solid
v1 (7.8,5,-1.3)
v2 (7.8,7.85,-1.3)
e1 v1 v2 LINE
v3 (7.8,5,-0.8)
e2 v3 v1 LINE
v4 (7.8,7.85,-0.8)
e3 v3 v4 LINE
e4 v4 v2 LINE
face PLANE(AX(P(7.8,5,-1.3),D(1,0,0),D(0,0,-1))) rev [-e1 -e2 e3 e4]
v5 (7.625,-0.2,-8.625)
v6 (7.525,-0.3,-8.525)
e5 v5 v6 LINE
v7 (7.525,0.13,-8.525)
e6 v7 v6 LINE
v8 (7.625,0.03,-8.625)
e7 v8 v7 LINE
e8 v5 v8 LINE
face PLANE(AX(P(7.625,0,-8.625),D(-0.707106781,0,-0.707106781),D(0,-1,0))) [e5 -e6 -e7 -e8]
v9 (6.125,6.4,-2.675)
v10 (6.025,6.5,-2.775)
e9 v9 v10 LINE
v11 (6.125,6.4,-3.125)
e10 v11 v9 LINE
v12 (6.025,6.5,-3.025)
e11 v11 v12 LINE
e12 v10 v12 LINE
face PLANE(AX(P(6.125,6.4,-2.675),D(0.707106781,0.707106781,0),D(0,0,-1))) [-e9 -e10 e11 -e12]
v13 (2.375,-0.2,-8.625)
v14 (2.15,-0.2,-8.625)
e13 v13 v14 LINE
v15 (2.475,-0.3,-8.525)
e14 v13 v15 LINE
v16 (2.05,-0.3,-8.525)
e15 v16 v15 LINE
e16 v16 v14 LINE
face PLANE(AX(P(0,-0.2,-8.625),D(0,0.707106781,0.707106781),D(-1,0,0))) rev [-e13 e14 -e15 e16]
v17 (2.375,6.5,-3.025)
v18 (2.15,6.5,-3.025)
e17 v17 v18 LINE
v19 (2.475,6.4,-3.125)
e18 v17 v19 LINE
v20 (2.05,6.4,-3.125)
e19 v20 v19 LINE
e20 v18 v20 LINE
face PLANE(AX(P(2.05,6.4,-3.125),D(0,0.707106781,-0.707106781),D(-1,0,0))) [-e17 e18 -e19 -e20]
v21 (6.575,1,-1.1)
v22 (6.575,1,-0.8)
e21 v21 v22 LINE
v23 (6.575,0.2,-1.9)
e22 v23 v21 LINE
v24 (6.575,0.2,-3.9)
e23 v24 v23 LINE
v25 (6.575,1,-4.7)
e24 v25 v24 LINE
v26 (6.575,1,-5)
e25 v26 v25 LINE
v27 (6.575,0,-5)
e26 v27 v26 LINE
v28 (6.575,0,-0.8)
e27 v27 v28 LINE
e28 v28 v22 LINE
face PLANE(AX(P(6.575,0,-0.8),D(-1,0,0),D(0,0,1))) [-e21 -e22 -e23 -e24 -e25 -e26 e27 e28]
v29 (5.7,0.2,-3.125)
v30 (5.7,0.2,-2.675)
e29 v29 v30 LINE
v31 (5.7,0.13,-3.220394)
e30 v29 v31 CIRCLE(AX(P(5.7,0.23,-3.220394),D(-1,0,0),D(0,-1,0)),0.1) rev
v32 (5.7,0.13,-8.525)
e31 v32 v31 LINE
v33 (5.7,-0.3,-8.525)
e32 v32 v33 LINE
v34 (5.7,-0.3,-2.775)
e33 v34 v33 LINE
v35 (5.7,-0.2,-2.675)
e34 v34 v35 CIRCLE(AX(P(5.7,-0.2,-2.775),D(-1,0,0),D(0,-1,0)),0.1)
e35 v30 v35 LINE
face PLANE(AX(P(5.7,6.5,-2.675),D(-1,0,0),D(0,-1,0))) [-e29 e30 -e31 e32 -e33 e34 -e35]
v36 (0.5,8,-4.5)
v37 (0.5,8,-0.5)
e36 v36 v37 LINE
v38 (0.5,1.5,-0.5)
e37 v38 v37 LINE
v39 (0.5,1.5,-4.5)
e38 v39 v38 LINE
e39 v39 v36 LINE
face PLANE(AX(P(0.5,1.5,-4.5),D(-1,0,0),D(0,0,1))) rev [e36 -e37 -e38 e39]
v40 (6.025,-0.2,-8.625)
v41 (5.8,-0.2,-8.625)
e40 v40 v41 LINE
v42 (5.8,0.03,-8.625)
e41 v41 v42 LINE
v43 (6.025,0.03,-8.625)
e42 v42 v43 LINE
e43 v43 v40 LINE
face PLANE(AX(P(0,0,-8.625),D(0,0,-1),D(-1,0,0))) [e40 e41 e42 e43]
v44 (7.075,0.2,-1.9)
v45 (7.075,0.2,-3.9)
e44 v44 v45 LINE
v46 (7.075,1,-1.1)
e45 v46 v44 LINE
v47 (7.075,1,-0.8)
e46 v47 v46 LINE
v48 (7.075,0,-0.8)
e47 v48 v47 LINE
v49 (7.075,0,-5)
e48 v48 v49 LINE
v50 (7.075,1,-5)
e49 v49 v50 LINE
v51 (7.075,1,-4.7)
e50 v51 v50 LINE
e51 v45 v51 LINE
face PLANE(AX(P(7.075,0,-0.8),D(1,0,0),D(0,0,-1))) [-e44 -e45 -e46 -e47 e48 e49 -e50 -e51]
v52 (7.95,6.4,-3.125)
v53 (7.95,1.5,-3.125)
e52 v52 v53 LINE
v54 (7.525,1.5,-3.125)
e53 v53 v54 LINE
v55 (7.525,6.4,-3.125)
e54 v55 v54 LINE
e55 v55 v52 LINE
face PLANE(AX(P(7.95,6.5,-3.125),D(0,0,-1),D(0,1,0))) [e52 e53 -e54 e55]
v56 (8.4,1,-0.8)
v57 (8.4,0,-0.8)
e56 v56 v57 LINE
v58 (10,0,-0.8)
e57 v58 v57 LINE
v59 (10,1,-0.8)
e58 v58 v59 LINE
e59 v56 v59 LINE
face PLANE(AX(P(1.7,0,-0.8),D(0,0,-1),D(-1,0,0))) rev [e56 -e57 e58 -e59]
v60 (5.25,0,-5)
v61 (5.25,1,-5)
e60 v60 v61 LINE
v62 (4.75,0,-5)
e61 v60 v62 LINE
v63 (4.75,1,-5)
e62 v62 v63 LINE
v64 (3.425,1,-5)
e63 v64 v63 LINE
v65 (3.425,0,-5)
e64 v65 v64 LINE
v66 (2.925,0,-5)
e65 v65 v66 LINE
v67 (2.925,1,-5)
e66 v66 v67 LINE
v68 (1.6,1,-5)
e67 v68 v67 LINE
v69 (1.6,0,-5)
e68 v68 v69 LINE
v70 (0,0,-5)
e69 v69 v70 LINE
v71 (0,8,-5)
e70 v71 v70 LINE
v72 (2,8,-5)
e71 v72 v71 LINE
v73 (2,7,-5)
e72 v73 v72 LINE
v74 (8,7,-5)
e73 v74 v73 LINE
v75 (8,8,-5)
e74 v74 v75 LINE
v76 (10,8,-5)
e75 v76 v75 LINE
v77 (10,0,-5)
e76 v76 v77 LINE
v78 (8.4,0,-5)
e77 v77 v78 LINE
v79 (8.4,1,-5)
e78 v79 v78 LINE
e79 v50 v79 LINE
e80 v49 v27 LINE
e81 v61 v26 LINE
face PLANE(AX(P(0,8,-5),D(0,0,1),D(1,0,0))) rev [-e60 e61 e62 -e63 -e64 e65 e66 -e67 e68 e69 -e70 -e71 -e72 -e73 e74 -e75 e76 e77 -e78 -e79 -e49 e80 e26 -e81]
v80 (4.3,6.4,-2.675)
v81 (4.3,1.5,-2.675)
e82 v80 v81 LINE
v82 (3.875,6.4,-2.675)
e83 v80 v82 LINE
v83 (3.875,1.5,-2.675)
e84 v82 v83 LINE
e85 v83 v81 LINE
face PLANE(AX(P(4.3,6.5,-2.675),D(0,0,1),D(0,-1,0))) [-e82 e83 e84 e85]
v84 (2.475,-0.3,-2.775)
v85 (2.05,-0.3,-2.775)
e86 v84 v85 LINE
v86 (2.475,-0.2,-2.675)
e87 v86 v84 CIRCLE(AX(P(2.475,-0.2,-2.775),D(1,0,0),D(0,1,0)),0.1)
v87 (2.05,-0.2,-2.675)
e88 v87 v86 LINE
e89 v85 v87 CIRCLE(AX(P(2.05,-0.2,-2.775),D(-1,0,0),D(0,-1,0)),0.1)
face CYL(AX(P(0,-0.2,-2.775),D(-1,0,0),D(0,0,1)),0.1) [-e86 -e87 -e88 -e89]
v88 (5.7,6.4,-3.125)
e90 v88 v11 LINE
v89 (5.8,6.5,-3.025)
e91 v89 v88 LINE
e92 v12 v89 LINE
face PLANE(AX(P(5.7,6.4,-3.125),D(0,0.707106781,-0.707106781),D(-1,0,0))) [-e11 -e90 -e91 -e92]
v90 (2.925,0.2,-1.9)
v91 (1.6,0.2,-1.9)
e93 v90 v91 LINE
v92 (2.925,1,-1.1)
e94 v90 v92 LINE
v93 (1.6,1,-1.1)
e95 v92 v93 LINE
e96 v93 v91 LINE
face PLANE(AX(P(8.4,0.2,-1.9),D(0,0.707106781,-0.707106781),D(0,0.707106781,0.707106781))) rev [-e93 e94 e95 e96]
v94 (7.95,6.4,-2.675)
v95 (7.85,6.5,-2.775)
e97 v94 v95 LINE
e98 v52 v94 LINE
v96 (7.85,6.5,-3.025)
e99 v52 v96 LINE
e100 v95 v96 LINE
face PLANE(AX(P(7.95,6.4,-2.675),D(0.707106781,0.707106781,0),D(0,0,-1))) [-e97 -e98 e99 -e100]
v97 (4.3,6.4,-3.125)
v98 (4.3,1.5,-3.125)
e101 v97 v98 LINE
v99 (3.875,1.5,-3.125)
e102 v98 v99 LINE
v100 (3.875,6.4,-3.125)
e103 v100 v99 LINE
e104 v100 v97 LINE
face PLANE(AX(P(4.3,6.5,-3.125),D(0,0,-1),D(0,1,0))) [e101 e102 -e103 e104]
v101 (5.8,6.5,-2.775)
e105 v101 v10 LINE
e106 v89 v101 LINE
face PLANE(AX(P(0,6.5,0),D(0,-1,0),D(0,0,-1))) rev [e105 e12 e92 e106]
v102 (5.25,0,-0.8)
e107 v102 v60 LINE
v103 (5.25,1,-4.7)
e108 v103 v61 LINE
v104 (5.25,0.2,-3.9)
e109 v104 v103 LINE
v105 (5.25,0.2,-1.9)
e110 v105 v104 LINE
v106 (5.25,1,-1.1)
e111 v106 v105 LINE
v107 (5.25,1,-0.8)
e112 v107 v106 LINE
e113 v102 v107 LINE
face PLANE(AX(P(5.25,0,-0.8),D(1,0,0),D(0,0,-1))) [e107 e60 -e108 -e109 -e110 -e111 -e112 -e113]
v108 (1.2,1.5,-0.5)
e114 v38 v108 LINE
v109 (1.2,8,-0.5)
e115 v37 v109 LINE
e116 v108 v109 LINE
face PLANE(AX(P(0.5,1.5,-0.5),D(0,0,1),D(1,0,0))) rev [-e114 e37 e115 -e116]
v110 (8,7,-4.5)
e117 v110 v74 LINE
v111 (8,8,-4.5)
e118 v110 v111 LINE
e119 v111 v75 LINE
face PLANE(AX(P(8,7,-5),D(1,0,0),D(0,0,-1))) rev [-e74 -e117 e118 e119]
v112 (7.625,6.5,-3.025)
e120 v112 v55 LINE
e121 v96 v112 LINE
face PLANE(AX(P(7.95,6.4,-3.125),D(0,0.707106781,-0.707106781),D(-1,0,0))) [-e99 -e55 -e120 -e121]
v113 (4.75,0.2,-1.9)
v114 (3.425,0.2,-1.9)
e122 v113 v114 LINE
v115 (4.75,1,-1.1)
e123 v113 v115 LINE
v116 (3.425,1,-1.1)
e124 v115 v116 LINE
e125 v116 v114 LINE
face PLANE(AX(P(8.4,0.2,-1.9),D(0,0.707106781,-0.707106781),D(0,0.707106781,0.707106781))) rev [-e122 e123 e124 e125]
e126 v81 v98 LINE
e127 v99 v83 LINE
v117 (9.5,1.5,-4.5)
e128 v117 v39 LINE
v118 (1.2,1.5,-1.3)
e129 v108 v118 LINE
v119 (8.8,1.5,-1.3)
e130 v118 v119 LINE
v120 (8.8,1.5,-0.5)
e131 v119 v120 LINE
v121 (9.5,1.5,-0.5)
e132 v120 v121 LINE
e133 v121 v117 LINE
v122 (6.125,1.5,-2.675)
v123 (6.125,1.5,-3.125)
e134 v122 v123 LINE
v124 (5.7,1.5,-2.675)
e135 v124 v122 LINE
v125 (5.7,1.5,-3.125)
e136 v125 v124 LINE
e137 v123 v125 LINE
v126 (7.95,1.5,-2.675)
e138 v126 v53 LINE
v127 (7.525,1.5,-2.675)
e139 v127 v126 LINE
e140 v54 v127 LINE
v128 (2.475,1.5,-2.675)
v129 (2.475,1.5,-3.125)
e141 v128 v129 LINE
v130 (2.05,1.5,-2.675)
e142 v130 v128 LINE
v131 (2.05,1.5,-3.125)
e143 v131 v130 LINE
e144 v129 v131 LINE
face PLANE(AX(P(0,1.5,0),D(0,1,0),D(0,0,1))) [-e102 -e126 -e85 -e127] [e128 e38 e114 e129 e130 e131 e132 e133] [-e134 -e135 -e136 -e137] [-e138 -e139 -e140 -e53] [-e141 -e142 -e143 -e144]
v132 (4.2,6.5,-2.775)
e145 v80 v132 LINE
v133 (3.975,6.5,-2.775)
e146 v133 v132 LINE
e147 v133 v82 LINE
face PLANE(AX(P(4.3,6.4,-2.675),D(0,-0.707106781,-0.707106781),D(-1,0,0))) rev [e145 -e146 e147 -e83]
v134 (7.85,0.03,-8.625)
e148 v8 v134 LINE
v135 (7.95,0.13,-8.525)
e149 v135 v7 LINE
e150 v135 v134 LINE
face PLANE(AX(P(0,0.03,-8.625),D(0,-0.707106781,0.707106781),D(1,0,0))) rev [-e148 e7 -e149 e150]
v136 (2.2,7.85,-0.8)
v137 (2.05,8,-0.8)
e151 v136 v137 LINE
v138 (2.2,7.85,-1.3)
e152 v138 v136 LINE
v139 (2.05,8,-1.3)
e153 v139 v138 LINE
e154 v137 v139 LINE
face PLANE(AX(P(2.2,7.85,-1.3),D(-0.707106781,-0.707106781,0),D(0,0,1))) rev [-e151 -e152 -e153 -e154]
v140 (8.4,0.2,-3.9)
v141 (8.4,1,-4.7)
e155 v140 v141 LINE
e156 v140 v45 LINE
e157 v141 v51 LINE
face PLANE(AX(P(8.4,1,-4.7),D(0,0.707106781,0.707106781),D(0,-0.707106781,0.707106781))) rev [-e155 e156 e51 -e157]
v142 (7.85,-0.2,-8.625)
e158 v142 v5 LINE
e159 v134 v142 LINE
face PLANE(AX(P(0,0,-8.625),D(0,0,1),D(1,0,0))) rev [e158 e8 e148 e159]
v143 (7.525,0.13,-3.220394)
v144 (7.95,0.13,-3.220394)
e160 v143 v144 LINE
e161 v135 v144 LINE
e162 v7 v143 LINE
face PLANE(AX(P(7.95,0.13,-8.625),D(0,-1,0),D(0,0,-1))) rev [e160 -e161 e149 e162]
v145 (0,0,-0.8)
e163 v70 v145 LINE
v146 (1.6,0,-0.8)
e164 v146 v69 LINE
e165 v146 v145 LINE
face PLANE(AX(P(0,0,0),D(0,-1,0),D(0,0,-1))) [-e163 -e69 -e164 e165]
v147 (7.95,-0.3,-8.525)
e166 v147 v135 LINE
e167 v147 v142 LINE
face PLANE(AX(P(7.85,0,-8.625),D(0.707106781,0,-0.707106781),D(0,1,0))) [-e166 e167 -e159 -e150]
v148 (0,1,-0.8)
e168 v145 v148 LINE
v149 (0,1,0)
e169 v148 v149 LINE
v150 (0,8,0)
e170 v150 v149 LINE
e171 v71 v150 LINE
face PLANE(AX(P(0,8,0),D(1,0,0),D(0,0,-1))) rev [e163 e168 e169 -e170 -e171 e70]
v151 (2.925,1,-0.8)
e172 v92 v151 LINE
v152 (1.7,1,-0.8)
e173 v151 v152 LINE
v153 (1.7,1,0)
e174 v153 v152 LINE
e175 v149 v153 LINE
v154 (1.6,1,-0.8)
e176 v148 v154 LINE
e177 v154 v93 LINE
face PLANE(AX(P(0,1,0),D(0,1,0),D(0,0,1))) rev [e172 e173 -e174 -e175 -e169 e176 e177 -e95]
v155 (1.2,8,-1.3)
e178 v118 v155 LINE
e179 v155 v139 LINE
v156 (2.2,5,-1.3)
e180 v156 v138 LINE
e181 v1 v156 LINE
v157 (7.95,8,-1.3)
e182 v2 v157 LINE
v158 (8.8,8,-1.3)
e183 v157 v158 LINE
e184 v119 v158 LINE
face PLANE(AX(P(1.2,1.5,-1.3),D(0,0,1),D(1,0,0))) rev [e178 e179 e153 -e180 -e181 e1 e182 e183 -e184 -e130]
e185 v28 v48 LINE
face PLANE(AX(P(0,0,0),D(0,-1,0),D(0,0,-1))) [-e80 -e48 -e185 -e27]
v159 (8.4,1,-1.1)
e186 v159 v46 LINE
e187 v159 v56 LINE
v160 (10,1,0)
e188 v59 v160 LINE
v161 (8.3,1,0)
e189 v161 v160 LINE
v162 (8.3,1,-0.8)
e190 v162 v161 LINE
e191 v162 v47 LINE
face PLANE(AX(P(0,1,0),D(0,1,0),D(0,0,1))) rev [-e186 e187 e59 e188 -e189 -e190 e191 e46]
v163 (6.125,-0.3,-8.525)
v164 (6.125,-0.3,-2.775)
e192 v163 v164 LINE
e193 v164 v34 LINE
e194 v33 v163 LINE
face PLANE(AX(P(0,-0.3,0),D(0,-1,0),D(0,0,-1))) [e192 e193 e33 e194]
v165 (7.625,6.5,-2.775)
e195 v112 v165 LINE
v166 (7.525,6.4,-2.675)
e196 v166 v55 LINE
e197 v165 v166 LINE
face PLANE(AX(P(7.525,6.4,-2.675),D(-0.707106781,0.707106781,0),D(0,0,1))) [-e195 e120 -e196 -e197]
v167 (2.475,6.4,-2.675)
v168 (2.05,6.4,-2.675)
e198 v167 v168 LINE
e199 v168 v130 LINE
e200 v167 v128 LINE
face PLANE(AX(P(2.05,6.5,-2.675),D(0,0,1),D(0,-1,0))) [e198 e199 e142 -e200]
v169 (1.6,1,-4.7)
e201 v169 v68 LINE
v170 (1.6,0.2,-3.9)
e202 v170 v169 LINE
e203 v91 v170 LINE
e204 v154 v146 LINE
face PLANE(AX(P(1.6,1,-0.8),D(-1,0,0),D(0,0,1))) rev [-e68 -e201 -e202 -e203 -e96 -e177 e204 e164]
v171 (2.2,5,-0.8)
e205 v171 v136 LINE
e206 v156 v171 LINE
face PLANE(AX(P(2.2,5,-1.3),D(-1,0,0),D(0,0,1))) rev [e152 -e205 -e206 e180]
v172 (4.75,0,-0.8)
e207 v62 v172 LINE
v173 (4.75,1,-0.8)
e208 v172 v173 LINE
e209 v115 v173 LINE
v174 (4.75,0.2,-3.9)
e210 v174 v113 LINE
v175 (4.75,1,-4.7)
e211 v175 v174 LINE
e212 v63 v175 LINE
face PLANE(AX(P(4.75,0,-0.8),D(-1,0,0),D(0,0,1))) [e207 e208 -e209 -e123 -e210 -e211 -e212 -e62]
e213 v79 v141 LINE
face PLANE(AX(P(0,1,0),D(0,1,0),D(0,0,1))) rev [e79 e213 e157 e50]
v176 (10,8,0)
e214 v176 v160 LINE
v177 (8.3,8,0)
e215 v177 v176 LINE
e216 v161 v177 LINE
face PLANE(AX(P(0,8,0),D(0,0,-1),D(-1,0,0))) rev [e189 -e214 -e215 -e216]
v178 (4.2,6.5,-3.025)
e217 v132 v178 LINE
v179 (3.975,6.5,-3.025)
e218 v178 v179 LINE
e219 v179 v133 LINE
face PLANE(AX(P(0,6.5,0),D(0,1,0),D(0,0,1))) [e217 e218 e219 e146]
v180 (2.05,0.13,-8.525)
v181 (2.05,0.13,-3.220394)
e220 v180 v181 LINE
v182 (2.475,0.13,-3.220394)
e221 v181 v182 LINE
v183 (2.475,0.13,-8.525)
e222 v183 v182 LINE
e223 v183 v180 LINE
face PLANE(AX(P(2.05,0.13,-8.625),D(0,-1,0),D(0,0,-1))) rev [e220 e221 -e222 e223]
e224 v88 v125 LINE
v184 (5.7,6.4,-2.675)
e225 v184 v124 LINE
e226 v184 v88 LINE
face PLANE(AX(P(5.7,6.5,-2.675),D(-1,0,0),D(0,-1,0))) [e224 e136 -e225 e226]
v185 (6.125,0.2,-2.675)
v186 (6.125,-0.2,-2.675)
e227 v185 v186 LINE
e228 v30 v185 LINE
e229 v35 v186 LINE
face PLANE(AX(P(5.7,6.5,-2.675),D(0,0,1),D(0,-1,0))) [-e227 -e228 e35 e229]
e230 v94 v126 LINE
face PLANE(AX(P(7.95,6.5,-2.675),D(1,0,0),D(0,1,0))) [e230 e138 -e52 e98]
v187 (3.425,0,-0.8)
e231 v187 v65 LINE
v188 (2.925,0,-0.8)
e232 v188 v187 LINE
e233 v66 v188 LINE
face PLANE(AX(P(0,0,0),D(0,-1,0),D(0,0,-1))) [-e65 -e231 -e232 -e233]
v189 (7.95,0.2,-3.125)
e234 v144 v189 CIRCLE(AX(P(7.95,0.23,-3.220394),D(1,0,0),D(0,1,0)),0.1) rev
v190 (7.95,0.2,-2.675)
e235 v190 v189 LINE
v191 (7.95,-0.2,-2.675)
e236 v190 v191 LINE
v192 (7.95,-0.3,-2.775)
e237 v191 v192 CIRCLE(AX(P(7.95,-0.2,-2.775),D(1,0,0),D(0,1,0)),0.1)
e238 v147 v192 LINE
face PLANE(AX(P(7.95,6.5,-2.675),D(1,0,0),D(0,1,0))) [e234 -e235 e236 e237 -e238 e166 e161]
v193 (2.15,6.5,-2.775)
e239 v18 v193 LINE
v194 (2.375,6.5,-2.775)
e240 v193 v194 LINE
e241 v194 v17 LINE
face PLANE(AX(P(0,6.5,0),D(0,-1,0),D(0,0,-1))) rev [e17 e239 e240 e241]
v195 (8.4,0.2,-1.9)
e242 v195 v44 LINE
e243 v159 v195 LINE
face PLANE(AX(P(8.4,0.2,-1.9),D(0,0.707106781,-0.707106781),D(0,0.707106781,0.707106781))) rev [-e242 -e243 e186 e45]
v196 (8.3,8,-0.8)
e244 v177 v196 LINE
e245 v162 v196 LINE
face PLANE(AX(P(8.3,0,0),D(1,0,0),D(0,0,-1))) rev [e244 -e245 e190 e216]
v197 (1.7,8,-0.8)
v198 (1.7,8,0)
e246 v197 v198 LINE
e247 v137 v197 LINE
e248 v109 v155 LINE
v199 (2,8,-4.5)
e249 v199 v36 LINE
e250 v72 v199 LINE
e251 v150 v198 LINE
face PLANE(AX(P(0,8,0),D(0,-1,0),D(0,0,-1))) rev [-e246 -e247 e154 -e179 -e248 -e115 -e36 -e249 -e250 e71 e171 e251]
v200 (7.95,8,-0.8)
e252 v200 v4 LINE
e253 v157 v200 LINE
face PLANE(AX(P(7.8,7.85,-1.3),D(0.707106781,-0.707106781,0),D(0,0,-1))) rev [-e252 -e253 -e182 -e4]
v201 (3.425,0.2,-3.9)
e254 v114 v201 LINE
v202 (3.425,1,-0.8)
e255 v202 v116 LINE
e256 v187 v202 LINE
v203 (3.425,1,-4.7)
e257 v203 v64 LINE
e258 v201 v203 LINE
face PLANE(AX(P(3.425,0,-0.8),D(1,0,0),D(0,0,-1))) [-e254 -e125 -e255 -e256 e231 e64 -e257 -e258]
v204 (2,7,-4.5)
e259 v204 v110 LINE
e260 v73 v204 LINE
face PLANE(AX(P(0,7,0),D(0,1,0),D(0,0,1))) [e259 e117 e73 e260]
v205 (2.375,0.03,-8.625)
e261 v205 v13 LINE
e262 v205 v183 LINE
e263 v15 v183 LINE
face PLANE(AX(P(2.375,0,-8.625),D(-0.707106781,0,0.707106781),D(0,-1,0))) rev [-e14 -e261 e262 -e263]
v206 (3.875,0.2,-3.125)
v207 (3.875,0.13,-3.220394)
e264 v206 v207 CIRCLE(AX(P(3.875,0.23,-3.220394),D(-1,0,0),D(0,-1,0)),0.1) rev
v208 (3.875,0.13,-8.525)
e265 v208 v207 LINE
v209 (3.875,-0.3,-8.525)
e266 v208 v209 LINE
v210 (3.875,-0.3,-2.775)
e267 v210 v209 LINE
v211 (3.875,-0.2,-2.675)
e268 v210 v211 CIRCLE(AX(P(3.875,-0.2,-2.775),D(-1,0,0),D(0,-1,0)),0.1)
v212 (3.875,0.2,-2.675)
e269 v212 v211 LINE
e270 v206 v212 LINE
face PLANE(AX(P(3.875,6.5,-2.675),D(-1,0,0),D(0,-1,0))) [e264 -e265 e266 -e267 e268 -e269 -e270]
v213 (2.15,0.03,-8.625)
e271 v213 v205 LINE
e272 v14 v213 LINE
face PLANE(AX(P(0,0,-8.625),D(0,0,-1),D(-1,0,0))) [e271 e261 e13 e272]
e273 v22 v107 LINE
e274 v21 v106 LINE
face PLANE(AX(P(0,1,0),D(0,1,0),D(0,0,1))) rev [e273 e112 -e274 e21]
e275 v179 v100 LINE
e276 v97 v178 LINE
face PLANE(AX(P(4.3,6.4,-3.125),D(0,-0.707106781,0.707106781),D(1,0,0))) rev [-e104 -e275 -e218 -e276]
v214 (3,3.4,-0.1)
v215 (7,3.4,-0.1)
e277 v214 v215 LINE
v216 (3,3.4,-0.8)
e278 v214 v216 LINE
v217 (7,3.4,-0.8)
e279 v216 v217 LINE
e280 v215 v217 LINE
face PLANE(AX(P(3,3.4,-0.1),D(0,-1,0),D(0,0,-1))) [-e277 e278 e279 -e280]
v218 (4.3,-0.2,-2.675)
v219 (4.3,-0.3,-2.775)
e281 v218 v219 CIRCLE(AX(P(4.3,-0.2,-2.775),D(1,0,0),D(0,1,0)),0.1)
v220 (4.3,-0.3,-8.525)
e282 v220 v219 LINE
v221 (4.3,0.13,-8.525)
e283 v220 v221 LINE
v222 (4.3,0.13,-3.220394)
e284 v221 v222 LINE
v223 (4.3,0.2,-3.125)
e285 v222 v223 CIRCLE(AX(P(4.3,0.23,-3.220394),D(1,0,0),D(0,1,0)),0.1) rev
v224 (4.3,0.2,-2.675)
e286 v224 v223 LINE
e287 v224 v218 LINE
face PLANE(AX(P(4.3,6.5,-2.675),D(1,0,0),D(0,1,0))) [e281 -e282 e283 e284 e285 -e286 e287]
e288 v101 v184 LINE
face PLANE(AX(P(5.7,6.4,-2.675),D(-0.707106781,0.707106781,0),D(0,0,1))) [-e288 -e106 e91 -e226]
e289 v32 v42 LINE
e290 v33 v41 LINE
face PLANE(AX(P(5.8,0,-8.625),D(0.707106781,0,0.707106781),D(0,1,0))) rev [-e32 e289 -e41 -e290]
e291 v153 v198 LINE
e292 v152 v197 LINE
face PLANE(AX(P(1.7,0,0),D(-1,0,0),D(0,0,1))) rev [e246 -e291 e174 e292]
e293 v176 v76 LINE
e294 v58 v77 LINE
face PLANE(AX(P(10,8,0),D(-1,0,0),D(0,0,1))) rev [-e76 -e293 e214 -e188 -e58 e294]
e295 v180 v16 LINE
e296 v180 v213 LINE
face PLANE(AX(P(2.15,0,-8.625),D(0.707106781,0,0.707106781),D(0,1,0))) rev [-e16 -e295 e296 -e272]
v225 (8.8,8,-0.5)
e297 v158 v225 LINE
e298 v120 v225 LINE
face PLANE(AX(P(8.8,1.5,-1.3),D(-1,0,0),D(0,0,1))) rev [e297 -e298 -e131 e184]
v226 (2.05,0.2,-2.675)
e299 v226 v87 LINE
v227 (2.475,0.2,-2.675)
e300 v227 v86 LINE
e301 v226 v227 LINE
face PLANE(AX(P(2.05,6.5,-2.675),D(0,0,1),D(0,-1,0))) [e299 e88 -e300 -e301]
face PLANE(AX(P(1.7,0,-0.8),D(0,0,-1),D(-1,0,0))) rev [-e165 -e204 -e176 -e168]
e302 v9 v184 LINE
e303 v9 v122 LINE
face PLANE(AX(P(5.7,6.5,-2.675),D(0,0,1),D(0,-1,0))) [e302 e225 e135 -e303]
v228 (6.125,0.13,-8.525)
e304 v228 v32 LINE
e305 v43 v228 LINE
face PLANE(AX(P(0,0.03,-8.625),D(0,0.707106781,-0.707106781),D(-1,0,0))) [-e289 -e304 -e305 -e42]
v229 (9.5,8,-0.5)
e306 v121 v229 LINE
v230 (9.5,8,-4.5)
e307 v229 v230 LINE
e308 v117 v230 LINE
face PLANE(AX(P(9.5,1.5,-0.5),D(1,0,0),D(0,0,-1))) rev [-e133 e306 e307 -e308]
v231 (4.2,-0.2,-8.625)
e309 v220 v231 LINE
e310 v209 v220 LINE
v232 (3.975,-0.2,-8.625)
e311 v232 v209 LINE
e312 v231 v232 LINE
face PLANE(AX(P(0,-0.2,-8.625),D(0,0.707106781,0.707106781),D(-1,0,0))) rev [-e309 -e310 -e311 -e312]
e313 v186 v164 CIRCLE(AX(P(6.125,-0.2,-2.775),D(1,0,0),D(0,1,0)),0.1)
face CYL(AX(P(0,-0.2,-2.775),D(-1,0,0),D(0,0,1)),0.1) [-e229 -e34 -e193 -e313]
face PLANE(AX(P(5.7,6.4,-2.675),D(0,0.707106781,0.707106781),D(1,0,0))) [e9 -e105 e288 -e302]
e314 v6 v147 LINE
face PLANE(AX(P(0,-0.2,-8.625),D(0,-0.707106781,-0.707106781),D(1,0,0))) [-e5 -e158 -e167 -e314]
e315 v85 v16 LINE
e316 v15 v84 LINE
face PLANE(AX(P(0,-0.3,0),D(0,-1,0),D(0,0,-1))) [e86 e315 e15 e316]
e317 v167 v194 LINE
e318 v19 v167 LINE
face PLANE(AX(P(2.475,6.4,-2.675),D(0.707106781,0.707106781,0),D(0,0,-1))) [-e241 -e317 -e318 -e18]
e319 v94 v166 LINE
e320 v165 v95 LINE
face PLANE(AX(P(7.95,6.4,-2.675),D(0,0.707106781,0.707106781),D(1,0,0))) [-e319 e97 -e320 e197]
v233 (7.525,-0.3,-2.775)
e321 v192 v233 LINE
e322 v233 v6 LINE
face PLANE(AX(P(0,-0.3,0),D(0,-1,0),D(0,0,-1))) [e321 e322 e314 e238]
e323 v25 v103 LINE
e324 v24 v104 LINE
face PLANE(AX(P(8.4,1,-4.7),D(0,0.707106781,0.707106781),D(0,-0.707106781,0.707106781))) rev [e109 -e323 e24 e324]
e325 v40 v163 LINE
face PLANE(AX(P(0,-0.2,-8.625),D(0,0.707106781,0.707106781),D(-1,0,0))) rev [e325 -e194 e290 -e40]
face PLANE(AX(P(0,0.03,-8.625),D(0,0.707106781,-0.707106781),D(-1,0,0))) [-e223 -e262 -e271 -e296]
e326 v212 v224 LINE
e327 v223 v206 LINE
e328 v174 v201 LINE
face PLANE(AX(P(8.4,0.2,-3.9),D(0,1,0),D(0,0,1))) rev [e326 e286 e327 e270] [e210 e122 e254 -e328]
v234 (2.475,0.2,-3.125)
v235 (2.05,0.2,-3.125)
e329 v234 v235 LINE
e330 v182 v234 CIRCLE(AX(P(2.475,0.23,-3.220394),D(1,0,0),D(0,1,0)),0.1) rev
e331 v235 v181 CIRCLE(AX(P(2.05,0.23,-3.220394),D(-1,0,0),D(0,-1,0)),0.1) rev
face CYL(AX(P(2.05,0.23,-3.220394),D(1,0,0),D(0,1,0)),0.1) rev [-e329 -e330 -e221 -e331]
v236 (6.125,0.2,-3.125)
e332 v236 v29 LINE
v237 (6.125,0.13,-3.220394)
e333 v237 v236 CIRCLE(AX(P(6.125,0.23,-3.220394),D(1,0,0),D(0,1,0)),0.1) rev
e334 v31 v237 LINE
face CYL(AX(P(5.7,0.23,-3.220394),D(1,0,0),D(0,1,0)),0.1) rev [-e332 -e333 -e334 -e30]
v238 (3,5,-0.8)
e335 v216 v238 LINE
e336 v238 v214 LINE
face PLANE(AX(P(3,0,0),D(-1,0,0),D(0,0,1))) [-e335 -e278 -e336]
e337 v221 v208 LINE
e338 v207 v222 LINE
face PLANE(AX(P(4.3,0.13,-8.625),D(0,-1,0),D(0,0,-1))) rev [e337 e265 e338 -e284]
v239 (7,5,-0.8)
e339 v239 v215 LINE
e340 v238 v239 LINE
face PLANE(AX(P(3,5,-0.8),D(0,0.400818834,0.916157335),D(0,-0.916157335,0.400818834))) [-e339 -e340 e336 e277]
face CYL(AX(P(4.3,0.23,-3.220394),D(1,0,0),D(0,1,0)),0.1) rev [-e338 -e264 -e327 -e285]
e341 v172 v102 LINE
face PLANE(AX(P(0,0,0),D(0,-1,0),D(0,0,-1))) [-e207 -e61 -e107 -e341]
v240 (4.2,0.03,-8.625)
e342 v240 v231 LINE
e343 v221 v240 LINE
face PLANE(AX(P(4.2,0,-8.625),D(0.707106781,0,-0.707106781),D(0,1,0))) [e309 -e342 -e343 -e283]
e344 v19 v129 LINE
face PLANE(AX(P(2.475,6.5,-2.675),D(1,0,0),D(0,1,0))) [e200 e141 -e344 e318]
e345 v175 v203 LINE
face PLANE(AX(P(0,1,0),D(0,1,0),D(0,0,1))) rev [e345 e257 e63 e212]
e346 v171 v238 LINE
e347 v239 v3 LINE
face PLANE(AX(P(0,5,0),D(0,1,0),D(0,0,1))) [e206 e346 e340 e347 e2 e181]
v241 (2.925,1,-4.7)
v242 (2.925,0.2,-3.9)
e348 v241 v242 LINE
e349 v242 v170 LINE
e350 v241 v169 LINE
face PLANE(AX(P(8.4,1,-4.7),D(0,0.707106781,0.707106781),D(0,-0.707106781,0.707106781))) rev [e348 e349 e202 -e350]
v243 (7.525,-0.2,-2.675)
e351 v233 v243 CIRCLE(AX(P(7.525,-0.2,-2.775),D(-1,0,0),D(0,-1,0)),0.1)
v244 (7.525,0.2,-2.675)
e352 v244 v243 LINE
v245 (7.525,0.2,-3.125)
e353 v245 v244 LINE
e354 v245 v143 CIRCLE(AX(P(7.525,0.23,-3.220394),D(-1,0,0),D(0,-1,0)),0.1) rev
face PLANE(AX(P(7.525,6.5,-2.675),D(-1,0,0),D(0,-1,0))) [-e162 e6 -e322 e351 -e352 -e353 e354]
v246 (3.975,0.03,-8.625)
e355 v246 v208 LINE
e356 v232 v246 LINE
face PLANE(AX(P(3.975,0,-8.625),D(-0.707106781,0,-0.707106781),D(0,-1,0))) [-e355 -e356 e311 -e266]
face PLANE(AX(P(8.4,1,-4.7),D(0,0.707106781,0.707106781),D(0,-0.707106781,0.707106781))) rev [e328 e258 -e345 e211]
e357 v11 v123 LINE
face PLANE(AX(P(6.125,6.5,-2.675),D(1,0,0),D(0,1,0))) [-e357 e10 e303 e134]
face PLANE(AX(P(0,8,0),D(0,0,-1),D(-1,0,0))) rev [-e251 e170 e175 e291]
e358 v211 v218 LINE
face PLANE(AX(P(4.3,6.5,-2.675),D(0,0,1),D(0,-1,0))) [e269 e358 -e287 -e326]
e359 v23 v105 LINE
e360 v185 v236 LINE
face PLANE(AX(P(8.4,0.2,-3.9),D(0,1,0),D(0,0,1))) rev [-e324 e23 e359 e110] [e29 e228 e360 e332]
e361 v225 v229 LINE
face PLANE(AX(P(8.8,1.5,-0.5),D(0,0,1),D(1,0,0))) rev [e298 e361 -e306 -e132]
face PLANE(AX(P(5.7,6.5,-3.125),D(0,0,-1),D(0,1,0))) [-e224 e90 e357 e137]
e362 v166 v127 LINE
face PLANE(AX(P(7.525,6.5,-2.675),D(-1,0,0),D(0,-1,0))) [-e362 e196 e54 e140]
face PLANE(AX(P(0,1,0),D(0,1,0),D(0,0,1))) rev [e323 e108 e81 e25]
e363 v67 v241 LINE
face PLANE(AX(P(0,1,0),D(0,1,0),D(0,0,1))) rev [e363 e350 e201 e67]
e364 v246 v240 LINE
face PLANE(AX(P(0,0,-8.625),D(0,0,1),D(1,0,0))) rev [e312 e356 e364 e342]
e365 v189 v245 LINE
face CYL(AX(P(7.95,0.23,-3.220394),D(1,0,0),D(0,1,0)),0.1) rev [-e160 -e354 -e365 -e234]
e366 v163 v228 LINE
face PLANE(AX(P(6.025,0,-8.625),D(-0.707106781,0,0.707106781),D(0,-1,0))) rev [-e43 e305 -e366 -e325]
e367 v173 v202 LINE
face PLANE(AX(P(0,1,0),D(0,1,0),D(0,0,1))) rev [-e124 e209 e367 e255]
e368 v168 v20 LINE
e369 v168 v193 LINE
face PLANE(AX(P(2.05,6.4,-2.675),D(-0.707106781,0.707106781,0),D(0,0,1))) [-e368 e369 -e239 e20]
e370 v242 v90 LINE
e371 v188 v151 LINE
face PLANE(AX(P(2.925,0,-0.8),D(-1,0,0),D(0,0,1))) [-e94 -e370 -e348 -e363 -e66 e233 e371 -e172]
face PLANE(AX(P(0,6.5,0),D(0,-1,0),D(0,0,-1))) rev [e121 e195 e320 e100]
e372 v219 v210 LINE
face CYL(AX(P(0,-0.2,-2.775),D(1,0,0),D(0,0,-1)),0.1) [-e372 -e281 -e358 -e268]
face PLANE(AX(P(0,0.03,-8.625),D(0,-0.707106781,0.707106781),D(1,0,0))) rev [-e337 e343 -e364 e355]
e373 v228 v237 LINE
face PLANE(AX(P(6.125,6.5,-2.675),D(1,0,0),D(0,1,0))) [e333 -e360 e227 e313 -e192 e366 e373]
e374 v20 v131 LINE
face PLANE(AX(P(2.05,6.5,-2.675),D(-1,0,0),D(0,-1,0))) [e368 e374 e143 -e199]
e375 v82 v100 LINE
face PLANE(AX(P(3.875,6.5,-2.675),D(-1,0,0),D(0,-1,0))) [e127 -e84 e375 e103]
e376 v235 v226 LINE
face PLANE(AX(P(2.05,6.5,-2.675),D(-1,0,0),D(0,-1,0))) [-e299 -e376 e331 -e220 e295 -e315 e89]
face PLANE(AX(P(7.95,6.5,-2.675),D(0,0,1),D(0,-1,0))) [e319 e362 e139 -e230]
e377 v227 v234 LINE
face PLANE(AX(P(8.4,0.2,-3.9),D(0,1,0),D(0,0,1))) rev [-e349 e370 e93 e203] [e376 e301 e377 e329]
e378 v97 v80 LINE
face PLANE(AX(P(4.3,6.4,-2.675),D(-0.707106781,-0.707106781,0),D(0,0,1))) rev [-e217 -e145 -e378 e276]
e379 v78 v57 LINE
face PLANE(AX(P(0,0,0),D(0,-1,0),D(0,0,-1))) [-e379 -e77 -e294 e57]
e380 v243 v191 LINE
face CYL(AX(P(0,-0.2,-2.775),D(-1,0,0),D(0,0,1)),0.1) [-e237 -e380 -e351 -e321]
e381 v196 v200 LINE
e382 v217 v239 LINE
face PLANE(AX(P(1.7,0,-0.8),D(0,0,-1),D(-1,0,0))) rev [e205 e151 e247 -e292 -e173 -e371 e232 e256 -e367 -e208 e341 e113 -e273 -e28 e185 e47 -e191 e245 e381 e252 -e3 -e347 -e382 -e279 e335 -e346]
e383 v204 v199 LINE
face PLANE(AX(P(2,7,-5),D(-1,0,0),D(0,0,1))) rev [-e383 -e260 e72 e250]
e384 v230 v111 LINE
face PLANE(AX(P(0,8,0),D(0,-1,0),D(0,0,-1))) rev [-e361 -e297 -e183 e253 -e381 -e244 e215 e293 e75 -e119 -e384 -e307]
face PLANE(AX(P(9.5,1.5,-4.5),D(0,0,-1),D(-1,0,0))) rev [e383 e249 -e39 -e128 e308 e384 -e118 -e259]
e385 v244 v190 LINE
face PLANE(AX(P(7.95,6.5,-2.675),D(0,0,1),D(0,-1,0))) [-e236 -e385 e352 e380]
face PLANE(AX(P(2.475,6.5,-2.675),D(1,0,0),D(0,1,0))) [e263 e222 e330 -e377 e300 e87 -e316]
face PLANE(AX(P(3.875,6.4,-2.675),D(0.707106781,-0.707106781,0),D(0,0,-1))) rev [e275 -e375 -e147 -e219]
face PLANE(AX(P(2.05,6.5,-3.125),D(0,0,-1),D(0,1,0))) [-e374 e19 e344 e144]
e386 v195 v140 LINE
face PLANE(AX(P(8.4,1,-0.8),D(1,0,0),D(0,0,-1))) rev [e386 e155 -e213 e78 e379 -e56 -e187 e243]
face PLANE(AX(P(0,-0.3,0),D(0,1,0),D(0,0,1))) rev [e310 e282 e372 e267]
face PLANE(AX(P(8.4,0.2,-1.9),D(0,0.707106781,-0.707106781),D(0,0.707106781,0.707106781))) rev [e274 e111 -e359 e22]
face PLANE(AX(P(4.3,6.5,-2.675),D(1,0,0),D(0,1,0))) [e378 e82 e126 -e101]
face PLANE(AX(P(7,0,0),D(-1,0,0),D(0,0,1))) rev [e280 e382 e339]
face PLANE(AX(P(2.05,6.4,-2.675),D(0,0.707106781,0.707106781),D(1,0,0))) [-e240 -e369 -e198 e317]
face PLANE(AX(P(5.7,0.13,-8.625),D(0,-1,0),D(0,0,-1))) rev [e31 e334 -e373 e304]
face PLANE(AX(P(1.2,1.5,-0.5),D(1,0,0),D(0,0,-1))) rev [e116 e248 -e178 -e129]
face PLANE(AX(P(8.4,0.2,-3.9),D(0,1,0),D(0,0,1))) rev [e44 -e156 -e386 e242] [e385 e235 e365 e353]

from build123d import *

# Parameters (mm, degrees)
ESQUISSE1_W             = 10
ESQUISSE1_H             = 5
BOSS_EXTRU_1_DEPTH      = 8
ESQUISSE2_W             = 6.6
ESQUISSE2_H             = 0.8
ENL_V_MAT_EXTRU_1_DEPTH = 8
ENL_V_MAT_EXTRU_2_DEPTH = 6.5
ESQUISSE5_W             = 6
ESQUISSE5_H             = 0.5
ENL_V_MAT_EXTRU_3_DEPTH = 1
ESQUISSE6_W             = 5.6
ESQUISSE6_H             = 0.5
ENL_V_MAT_EXTRU_4_DEPTH = 3
ESQUISSE7_W             = 0.8
ESQUISSE7_H             = 1
ENL_V_MAT_EXTRU_5_DEPTH = 10
ESQUISSE8_W             = 6.8
ESQUISSE8_H             = 4.2
ENL_V_MAT_EXTRU_6_DEPTH = 1
BOSS_EXTRU_2_DEPTH      = 6.8
BOSS_EXTRU_3_DEPTH      = 2
BOSS_EXTRU_3_DEPTH_BACK = 2
ESQUISSE12_W            = 0.5
ESQUISSE12_H            = 4.2
BOSS_EXTRU_4_DEPTH      = 1
CHANFREIN1_SIZE         = 0.15
BOSS_EXTRU_5_DEPTH      = 0.5
BOSS_EXTRU_5_DEPTH_BACK = 6.3
ESQUISSE13_W            = 0.425
ESQUISSE13_H            = 0.45
CHANFREIN2_SIZE         = 0.1
ESQUISSE14_W            = 0.425
ESQUISSE14_H            = 0.43
BOSS_EXTRU_6_DEPTH      = 5.5
CONG_1_R                = 0.1
CHANFREIN3_SIZE         = 0.1


with BuildPart() as part:
    # Esquisse1 → Boss.-Extru.1 (new body)
    with BuildSketch(Plane(origin=(0, 0, 0), x_dir=(1, 0, 0), z_dir=(0, 1, 0))):
        with Locations((5, 2.5)):
            Rectangle(ESQUISSE1_W, ESQUISSE1_H)
    extrude(amount=BOSS_EXTRU_1_DEPTH)

    # Esquisse2 → Enlèv. mat.-Extru.1 (cut)
    with BuildSketch(Plane(origin=(0, 8, 0), x_dir=(1, 0, 0), z_dir=(0, 1, 0))):
        with Locations((5, 0.4)):
            Rectangle(ESQUISSE2_W, ESQUISSE2_H)
    extrude(amount=-ENL_V_MAT_EXTRU_1_DEPTH, mode=Mode.SUBTRACT)

    # Esquisse4 → Enlèv. mat.-Extru.2 (cut)
    with BuildSketch(Plane(origin=(0, 8, 0), x_dir=(1, 0, 0), z_dir=(0, 1, 0))):
        Polygon((0.5, 0.5), (1.2, 0.5), (1.2, 1.3), (8.8, 1.3), (8.8, 0.5), (9.5, 0.5), (9.5, 4.5), (0.5, 4.5), align=None)
    extrude(amount=-ENL_V_MAT_EXTRU_2_DEPTH, mode=Mode.SUBTRACT)

    # Esquisse5 → Enlèv. mat.-Extru.3 (cut)
    with BuildSketch(Plane(origin=(0, 8, 0), x_dir=(1, 0, 0), z_dir=(0, 1, 0))):
        with Locations((5, 4.75)):
            Rectangle(ESQUISSE5_W, ESQUISSE5_H)
    extrude(amount=-ENL_V_MAT_EXTRU_3_DEPTH, mode=Mode.SUBTRACT)

    # Esquisse6 → Enlèv. mat.-Extru.4 (cut)
    with BuildSketch(Plane(origin=(0, 8, 0), x_dir=(1, 0, 0), z_dir=(0, 1, 0))):
        with Locations((5, 1.05)):
            Rectangle(ESQUISSE6_W, ESQUISSE6_H)
    extrude(amount=-ENL_V_MAT_EXTRU_4_DEPTH, mode=Mode.SUBTRACT)

    # Esquisse7 → Enlèv. mat.-Extru.5 (cut)
    with BuildSketch(Plane(origin=(10, 0, 0), x_dir=(0, 0, -1), z_dir=(1, 0, 0))):
        with Locations((0.4, 0.5)):
            Rectangle(ESQUISSE7_W, ESQUISSE7_H)
    extrude(amount=-ENL_V_MAT_EXTRU_5_DEPTH, mode=Mode.SUBTRACT)

    # Esquisse8 → Enlèv. mat.-Extru.6 (cut)
    with BuildSketch(Plane.XZ):
        with Locations((5, -2.9)):
            Rectangle(ESQUISSE8_W, ESQUISSE8_H)
    extrude(amount=-ENL_V_MAT_EXTRU_6_DEPTH, mode=Mode.SUBTRACT)

    # Esquisse9 → Boss.-Extru.2 (add)
    with BuildSketch(Plane(origin=(1.6, 0, 0), x_dir=(0, 0, -1), z_dir=(1, 0, 0))):
        Polygon((4.7, 1), (3.9, 0.2), (1.9, 0.2), (1.1, 1), align=None)
    extrude(amount=BOSS_EXTRU_2_DEPTH)

    # Esquisse11 → Boss.-Extru.3 (add, two sides: drawn at the far end of the back side and taken through both)
    with BuildSketch(Plane(origin=(5, 0, 0), x_dir=(0, 0, -1), z_dir=(1, 0, 0)).offset(-BOSS_EXTRU_3_DEPTH_BACK)):
        Polygon((0.8, 5), (0.1, 3.4), (0.8, 3.4), align=None)
    extrude(amount=BOSS_EXTRU_3_DEPTH + BOSS_EXTRU_3_DEPTH_BACK)

    # Esquisse12 → Boss.-Extru.4 (add)
    with BuildSketch(Plane(origin=(0, 1, 0), x_dir=(1, 0, 0), z_dir=(0, 1, 0))):
        with Locations((5, 2.9)):
            Rectangle(ESQUISSE12_W, ESQUISSE12_H)
        with Locations((3.175, 2.9)):
            Rectangle(ESQUISSE12_W, ESQUISSE12_H)
        with Locations((6.825, 2.9)):
            Rectangle(ESQUISSE12_W, ESQUISSE12_H)
    extrude(amount=-BOSS_EXTRU_4_DEPTH)

    # Chanfrein1
    chanfrein1_edges = [part.edges().sort_by_distance(p)[0] for p in [
        (2.2, 8, -1.05),
        (7.8, 8, -1.05),
    ]]
    chamfer(chanfrein1_edges, length=CHANFREIN1_SIZE)

    # Esquisse13 → Boss.-Extru.5 (add, two sides: drawn at the far end of the back side and taken through both)
    with BuildSketch(Plane.XZ.offset(-0.2).offset(-BOSS_EXTRU_5_DEPTH_BACK)):
        with Locations((2.2625, -2.9)):
            Rectangle(ESQUISSE13_W, ESQUISSE13_H)
        with Locations((4.0875, -2.9)):
            Rectangle(ESQUISSE13_W, ESQUISSE13_H)
        with Locations((5.9125, -2.9)):
            Rectangle(ESQUISSE13_W, ESQUISSE13_H)
        with Locations((7.7375, -2.9)):
            Rectangle(ESQUISSE13_W, ESQUISSE13_H)
    extrude(amount=BOSS_EXTRU_5_DEPTH + BOSS_EXTRU_5_DEPTH_BACK)

    # Chanfrein2
    chanfrein2_edges = [part.edges().sort_by_distance(p)[0] for p in [
        (2.05, 6.5, -2.9),
        (2.2625, 6.5, -2.675),
        (2.475, 6.5, -2.9),
        (2.2625, 6.5, -3.125),
        (4.3, 6.5, -2.9),
        (4.0875, 6.5, -3.125),
        (3.875, 6.5, -2.9),
        (4.0875, 6.5, -2.675),
        (5.7, 6.5, -2.9),
        (5.9125, 6.5, -2.675),
        (6.125, 6.5, -2.9),
        (5.9125, 6.5, -3.125),
        (7.7375, 6.5, -2.675),
        (7.95, 6.5, -2.9),
        (7.7375, 6.5, -3.125),
        (7.525, 6.5, -2.9),
    ]]
    chamfer(chanfrein2_edges, length=CHANFREIN2_SIZE)

    # Esquisse14 → Boss.-Extru.6 (add)
    with BuildSketch(Plane(origin=(0, 0, -3.125), x_dir=(-1, 0, 0), z_dir=(0, 0, -1))):
        with Locations((-7.7375, -0.085)):
            Rectangle(ESQUISSE14_W, ESQUISSE14_H)
        with Locations((-5.9125, -0.085)):
            Rectangle(ESQUISSE14_W, ESQUISSE14_H)
        with Locations((-4.0875, -0.085)):
            Rectangle(ESQUISSE14_W, ESQUISSE14_H)
        with Locations((-2.2625, -0.085)):
            Rectangle(ESQUISSE14_W, ESQUISSE14_H)
    extrude(amount=BOSS_EXTRU_6_DEPTH)

    # Congé1
    # the kernel refuses this fillet: 0.1 mm, written as the material it adds along each edge
    with BuildSketch(Plane(origin=(2.475, 0.13, -3.125), x_dir=(0, 0, -1), z_dir=(-1, 0, 0))) as cong_1_piece_1:
        with BuildLine():
            CenterArc((0.09539392, -0.1), CONG_1_R, 90, 72.542396876)
            Line((0, -0.07), (0, 0))
            Line((0, 0), (0.09539392, 0))
        make_face()
    extrude(amount=0.425)
    with BuildSketch(Plane(origin=(3.875, 0.13, -3.125), x_dir=(0, 0, -1), z_dir=(1, 0, 0)), Plane(origin=(7.525, 0.13, -3.125), x_dir=(0, 0, -1), z_dir=(1, 0, 0))) as cong_1_piece_2:
        with BuildLine():
            CenterArc((0.09539392, 0.1), CONG_1_R, 197.457603124, 72.542396876)
            Line((0, 0.07), (0, 0))
            Line((0, 0), (0.09539392, 0))
        make_face()
    extrude(amount=0.425)
    with BuildSketch(Plane(origin=(6.125, 0.13, -3.125), x_dir=(0, 1, 0), z_dir=(-1, 0, 0))) as cong_1_piece_3:
        with BuildLine():
            CenterArc((0.1, 0.09539392), CONG_1_R, 180, 72.542396876)
            Line((0, 0.09539392), (0, 0))
            Line((0, 0), (0.07, 0))
        make_face()
    extrude(amount=0.425)
    # the kernel refuses this fillet: 0.1 mm, written as the material it takes off along each edge
    with BuildSketch(Plane(origin=(1.8, -0.3, -2.675), x_dir=(0, 1, 0), z_dir=(1, 0, 0)), Plane(origin=(3.625, -0.3, -2.675), x_dir=(0, 1, 0), z_dir=(1, 0, 0))) as cong_1_2_piece_1:
        with BuildLine():
            CenterArc((CONG_1_R, -CONG_1_R), CONG_1_R, 90, 90)
            Line((0, -CONG_1_R), (0, 0))
            Line((0, 0), (CONG_1_R, 0))
        make_face()
    extrude(amount=0.925, mode=Mode.SUBTRACT)
    with BuildSketch(Plane(origin=(6.375, -0.3, -2.675), x_dir=(0, 1, 0), z_dir=(-1, 0, 0)), Plane(origin=(8.2, -0.3, -2.675), x_dir=(0, 1, 0), z_dir=(-1, 0, 0))) as cong_1_2_piece_2:
        with BuildLine():
            CenterArc((CONG_1_R, CONG_1_R), CONG_1_R, 180, 90)
            Line((0, CONG_1_R), (0, 0))
            Line((0, 0), (CONG_1_R, 0))
        make_face()
    extrude(amount=0.925, mode=Mode.SUBTRACT)

    # Chanfrein3
    chanfrein3_edges = [part.edges().sort_by_distance(p)[0] for p in [
        (7.95, -0.085, -8.625),
        (7.7375, -0.3, -8.625),
        (7.525, -0.085, -8.625),
        (7.7375, 0.13, -8.625),
        (5.7, -0.085, -8.625),
        (5.9125, 0.13, -8.625),
        (6.125, -0.085, -8.625),
        (5.9125, -0.3, -8.625),
        (4.3, -0.085, -8.625),
        (4.0875, -0.3, -8.625),
        (3.875, -0.085, -8.625),
        (4.0875, 0.13, -8.625),
        (2.05, -0.085, -8.625),
        (2.2625, 0.13, -8.625),
        (2.475, -0.085, -8.625),
        (2.2625, -0.3, -8.625),
    ]]
    chamfer(chanfrein3_edges, length=CHANFREIN3_SIZE)


solid = part.part
